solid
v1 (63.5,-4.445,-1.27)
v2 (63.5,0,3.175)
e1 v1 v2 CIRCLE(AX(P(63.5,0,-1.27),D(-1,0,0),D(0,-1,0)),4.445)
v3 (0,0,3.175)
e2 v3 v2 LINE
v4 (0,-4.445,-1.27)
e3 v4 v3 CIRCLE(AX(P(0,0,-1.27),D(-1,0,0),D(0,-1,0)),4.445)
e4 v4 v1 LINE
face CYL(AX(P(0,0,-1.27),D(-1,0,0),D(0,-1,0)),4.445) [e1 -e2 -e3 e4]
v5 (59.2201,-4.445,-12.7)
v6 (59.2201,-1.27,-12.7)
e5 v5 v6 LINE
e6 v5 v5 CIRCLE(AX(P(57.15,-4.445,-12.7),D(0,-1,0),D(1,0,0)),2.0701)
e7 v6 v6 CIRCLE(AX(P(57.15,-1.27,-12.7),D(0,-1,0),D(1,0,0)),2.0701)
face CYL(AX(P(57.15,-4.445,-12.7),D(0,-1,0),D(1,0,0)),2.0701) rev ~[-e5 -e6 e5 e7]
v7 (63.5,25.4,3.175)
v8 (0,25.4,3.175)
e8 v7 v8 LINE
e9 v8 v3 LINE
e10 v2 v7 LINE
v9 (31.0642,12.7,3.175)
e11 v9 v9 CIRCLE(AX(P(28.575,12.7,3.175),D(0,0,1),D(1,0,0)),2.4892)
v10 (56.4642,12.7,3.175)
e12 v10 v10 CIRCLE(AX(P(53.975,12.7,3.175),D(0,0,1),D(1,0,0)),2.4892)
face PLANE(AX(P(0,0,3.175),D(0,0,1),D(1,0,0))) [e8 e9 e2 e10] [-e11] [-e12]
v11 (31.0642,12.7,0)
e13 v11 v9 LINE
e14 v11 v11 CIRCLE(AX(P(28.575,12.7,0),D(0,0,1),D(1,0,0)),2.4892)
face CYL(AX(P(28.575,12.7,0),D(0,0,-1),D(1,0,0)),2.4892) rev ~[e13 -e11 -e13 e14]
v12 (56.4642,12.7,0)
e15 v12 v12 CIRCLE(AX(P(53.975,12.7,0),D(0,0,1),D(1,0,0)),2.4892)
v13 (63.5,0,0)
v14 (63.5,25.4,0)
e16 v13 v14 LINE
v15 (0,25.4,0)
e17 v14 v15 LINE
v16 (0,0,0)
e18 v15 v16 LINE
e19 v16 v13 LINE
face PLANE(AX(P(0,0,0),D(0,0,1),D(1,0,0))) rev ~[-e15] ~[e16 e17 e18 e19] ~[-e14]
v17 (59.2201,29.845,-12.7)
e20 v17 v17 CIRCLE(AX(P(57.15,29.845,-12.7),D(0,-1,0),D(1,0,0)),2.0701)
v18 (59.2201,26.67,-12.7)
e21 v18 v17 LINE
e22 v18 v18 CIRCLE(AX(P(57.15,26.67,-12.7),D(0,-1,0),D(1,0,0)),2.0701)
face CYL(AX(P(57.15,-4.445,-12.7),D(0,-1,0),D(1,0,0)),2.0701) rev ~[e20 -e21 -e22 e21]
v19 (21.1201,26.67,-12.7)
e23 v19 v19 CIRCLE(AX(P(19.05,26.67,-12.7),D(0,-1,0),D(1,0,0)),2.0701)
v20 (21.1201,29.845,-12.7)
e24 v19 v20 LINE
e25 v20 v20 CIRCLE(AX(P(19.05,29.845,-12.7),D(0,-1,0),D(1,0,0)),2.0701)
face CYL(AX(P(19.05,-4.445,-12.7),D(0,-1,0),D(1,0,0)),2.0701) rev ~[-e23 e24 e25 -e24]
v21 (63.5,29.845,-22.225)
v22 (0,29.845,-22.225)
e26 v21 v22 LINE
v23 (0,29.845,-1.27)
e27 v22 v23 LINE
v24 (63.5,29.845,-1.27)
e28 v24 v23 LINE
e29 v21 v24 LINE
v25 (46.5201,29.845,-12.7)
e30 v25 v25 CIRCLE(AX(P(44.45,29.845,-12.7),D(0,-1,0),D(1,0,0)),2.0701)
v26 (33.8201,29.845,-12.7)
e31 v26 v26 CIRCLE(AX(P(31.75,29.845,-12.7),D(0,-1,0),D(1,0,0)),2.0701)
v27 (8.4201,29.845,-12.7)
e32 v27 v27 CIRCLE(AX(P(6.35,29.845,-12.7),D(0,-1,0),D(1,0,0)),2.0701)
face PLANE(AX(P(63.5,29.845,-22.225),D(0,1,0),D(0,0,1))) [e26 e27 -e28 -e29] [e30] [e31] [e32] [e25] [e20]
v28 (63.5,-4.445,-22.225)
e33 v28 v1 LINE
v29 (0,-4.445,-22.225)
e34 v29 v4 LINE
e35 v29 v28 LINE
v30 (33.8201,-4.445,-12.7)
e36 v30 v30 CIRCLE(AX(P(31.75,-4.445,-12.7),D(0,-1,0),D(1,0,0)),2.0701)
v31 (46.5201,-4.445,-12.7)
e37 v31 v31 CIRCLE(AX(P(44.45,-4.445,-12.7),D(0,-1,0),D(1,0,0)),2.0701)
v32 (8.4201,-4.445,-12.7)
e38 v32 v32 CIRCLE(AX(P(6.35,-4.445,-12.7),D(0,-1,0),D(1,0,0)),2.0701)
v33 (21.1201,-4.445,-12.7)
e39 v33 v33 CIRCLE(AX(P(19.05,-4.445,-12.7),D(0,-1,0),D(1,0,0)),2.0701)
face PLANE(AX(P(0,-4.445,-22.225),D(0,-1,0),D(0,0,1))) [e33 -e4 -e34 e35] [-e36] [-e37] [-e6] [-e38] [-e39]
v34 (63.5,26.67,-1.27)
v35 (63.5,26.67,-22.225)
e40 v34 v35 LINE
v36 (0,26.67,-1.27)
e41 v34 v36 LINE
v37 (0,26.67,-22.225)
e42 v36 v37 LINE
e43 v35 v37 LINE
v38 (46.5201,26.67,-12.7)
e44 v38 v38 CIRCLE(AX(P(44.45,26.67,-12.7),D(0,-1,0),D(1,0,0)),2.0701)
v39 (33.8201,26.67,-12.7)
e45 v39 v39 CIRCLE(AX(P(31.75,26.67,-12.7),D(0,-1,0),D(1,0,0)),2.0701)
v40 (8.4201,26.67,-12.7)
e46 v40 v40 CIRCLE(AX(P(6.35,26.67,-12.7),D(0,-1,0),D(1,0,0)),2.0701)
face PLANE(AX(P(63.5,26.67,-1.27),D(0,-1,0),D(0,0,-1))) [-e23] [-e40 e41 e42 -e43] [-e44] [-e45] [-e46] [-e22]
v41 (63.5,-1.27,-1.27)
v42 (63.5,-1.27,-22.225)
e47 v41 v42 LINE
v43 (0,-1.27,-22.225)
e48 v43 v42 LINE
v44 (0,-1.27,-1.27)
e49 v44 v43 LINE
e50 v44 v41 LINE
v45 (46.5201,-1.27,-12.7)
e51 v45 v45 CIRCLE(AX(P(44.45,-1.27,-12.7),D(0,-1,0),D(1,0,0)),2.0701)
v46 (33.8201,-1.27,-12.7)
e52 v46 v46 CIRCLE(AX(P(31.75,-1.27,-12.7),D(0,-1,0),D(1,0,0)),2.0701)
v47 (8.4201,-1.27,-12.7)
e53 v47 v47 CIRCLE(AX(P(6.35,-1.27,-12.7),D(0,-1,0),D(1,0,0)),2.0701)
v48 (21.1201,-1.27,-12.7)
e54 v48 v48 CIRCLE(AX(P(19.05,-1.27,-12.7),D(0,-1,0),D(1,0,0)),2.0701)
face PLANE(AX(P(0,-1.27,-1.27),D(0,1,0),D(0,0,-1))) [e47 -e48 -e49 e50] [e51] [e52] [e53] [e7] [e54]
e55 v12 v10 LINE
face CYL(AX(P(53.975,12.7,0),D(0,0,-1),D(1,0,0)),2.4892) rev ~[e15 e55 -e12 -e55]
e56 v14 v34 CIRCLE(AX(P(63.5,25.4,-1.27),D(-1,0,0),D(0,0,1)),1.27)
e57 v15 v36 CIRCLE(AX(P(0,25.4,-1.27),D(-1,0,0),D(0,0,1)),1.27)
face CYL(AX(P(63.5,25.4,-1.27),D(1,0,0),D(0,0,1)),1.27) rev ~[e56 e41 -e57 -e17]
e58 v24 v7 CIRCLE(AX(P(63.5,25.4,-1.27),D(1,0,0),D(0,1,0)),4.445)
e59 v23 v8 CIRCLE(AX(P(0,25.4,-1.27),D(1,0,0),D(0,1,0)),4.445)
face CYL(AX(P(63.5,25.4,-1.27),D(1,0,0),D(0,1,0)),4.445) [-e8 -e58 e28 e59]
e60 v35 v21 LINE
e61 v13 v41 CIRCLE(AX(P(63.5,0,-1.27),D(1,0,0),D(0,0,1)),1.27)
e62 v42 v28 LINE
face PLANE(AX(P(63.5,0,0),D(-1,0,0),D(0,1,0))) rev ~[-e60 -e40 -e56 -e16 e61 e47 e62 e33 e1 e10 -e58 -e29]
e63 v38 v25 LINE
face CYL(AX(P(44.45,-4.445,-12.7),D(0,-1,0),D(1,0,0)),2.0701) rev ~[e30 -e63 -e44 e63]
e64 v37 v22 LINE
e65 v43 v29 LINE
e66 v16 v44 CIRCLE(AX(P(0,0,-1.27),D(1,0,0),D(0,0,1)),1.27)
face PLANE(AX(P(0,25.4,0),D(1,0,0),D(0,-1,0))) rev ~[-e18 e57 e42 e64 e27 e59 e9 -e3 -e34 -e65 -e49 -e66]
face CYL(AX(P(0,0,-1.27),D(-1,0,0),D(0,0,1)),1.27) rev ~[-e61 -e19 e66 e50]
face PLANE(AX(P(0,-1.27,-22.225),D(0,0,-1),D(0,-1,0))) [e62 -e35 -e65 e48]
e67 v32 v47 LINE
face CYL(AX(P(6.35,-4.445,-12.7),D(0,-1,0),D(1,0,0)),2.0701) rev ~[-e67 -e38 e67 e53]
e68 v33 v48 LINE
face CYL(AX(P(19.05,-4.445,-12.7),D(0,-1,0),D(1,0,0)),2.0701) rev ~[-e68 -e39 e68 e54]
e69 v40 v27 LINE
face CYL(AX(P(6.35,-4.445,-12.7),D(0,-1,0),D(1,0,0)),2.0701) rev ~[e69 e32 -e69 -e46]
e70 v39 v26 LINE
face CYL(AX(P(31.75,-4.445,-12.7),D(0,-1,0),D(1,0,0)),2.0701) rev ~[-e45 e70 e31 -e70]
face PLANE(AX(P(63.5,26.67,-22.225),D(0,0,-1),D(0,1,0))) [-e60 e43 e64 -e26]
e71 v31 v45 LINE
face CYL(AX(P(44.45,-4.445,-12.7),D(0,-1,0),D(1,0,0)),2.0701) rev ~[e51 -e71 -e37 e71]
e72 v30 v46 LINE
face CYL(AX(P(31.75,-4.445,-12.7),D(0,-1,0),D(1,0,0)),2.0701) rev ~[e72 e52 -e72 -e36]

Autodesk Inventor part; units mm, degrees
ref_plane "YZ Plane" through (0, 0, 0) normal (1, 0, 0) x (0, 1, 0)
ref_plane "XZ Plane" through (0, 0, 0) normal (0, 1, 0) x (-1, 0, 0)
ref_plane "XY Plane" through (0, 0, 0) normal (0, 0, 1) x (1, 0, 0)
sketch "Sketch1 outline for Plate1" plane through (0, 0, 0) normal (0, 0, 1) x (1, 0, 0)
  line L0 (0, 25.4) -> (0, 0)
  line L1 (63.5, 25.4) -> (0, 25.4)
  line L2 (0, 0) -> (63.5, 0)
  line L3 (63.5, 0) -> (63.5, 25.4)
  circle A0 centre (28.575, 12.7) radius 2.4892
  circle A1 centre (53.975, 12.7) radius 2.4892
extrude "Plate1" add sketch "Sketch1 outline for Plate1" along normal blind 3.175
sketch "Sketch2" plane through (63.5, 26.67, -1.27) normal (0, 1, 0) x (-1, 0, 0)
  line L0 (63.5, 0) -> (0, 0)
  line L1 (0, 0) -> (0, -20.955)
  line L2 (0, -20.955) -> (63.5, -20.955)
  line L3 (63.5, -20.955) -> (63.5, 0)
edge flange "Flange1" height 25.4 angle 90 thickness 3.175 bend radius 1.27 thickness toward (0, 1, 0) relief tear relief width 3.175 relief depth 1.5875 corner gap 3.175 corner form 0 edges at (31.75, 25.4, 0) (31.75, 0, 0) wall of the first edge with corners at (0, 26.67, -1.27) (63.5, 26.67, -1.27) (63.5, 26.67, -22.225) (0, 26.67, -22.225)
bend "Bend1"
corner "Corner1"
sketch "Sketch1" plane through (0, 0, 0) normal (0, 0, 1) x (1, 0, 0)
  line L0 (0, 0) -> (75.688628, 0)
  line L1 (75.688628, -63.5) -> (0, -63.5)
  line L2 (20.955, 0) -> (25.144314, 0)
  line L3 (25.144314, 0) -> (25.144314, -3.175)
  line L4 (25.144314, -3.175) -> (20.955, -3.175)
  line L5 (20.955, -3.175) -> (20.955, 0)
  line L6 (20.955, -63.5) -> (20.955, 0)
  line L7 (25.144314, -63.5) -> (25.144314, 0)
  line L8 (20.955, -63.5) -> (25.144314, -63.5)
  line L9 (25.144314, -63.5) -> (25.144314, -60.325)
  line L10 (25.144314, -60.325) -> (20.955, -60.325)
  line L11 (20.955, -60.325) -> (20.955, -63.5)
  line L12 (50.544314, -63.5) -> (54.733628, -63.5)
  line L13 (54.733628, -63.5) -> (54.733628, -60.325)
  line L14 (54.733628, -60.325) -> (50.544314, -60.325)
  line L15 (50.544314, -60.325) -> (50.544314, -63.5)
  line L16 (50.544314, 0) -> (50.544314, -63.5)
  line L17 (54.733628, 0) -> (54.733628, -63.5)
  line L18 (50.544314, 0) -> (54.733628, 0)
  line L19 (54.733628, 0) -> (54.733628, -3.175)
  line L20 (54.733628, -3.175) -> (50.544314, -3.175)
  line L21 (50.544314, -3.175) -> (50.544314, 0)
  dimension "d10" = 12.7
  dimension "d11" = 28.575
sketch "Sketch3" plane through (0, -4.445, -22.225) normal (0, -1, 0) x (1, 0, 0)
  line L0 (0, 0) -> (0, 20.955) projected
  line L1 (63.5, 0) -> (0, 0) projected
  circle A0 centre (6.35, 9.525) radius 2.0701
  circle A1 centre (19.05, 9.525) radius 2.0701
  circle A2 centre (31.75, 9.525) radius 2.0701
  circle A3 centre (44.45, 9.525) radius 2.0701
  circle A4 centre (57.15, 9.525) radius 2.0701
  point P0 (0, 22.225)
  dimension "d23" = 4.1402
  dimension "d24" = 12.7
  dimension "d25" = 6.35
  dimension "d28" = 12.7
extrude "Extrusion1" cut sketch "Sketch3" against normal blind 50.8
equation "\"d13\" = BendReliefWidth"
equation "\"d14\" = BendReliefDepth"
equation "\"d15\" = MinimumRemnant"
equation "\"d16\" = BendRadius"
equation "\"d20\" = CornerReliefSize"
equation "\"d21\" = GapSize"
equation "\"d22\" = JacobiRadiusSize"
equation "\"BendRadius\" = Thickness"
equation "\"BendReliefWidth\" = Thickness"
equation "\"BendReliefDepth\" = 0.5 * Thickness"
equation "\"CornerReliefSize\" = 4 * Thickness"
equation "\"MinimumRemnant\" = 2 * Thickness"
equation "\"TransitionRadius\" = BendRadius"
equation "\"JacobiRadiusSize\" = BendRadius"
equation "\"GapSize\" = Thickness"
equation "\"d12\" = BendRadius"
equation "\"Thickness\" = 3.175"
properties part number "Side Mount Custom" material "Aluminum 6061"
